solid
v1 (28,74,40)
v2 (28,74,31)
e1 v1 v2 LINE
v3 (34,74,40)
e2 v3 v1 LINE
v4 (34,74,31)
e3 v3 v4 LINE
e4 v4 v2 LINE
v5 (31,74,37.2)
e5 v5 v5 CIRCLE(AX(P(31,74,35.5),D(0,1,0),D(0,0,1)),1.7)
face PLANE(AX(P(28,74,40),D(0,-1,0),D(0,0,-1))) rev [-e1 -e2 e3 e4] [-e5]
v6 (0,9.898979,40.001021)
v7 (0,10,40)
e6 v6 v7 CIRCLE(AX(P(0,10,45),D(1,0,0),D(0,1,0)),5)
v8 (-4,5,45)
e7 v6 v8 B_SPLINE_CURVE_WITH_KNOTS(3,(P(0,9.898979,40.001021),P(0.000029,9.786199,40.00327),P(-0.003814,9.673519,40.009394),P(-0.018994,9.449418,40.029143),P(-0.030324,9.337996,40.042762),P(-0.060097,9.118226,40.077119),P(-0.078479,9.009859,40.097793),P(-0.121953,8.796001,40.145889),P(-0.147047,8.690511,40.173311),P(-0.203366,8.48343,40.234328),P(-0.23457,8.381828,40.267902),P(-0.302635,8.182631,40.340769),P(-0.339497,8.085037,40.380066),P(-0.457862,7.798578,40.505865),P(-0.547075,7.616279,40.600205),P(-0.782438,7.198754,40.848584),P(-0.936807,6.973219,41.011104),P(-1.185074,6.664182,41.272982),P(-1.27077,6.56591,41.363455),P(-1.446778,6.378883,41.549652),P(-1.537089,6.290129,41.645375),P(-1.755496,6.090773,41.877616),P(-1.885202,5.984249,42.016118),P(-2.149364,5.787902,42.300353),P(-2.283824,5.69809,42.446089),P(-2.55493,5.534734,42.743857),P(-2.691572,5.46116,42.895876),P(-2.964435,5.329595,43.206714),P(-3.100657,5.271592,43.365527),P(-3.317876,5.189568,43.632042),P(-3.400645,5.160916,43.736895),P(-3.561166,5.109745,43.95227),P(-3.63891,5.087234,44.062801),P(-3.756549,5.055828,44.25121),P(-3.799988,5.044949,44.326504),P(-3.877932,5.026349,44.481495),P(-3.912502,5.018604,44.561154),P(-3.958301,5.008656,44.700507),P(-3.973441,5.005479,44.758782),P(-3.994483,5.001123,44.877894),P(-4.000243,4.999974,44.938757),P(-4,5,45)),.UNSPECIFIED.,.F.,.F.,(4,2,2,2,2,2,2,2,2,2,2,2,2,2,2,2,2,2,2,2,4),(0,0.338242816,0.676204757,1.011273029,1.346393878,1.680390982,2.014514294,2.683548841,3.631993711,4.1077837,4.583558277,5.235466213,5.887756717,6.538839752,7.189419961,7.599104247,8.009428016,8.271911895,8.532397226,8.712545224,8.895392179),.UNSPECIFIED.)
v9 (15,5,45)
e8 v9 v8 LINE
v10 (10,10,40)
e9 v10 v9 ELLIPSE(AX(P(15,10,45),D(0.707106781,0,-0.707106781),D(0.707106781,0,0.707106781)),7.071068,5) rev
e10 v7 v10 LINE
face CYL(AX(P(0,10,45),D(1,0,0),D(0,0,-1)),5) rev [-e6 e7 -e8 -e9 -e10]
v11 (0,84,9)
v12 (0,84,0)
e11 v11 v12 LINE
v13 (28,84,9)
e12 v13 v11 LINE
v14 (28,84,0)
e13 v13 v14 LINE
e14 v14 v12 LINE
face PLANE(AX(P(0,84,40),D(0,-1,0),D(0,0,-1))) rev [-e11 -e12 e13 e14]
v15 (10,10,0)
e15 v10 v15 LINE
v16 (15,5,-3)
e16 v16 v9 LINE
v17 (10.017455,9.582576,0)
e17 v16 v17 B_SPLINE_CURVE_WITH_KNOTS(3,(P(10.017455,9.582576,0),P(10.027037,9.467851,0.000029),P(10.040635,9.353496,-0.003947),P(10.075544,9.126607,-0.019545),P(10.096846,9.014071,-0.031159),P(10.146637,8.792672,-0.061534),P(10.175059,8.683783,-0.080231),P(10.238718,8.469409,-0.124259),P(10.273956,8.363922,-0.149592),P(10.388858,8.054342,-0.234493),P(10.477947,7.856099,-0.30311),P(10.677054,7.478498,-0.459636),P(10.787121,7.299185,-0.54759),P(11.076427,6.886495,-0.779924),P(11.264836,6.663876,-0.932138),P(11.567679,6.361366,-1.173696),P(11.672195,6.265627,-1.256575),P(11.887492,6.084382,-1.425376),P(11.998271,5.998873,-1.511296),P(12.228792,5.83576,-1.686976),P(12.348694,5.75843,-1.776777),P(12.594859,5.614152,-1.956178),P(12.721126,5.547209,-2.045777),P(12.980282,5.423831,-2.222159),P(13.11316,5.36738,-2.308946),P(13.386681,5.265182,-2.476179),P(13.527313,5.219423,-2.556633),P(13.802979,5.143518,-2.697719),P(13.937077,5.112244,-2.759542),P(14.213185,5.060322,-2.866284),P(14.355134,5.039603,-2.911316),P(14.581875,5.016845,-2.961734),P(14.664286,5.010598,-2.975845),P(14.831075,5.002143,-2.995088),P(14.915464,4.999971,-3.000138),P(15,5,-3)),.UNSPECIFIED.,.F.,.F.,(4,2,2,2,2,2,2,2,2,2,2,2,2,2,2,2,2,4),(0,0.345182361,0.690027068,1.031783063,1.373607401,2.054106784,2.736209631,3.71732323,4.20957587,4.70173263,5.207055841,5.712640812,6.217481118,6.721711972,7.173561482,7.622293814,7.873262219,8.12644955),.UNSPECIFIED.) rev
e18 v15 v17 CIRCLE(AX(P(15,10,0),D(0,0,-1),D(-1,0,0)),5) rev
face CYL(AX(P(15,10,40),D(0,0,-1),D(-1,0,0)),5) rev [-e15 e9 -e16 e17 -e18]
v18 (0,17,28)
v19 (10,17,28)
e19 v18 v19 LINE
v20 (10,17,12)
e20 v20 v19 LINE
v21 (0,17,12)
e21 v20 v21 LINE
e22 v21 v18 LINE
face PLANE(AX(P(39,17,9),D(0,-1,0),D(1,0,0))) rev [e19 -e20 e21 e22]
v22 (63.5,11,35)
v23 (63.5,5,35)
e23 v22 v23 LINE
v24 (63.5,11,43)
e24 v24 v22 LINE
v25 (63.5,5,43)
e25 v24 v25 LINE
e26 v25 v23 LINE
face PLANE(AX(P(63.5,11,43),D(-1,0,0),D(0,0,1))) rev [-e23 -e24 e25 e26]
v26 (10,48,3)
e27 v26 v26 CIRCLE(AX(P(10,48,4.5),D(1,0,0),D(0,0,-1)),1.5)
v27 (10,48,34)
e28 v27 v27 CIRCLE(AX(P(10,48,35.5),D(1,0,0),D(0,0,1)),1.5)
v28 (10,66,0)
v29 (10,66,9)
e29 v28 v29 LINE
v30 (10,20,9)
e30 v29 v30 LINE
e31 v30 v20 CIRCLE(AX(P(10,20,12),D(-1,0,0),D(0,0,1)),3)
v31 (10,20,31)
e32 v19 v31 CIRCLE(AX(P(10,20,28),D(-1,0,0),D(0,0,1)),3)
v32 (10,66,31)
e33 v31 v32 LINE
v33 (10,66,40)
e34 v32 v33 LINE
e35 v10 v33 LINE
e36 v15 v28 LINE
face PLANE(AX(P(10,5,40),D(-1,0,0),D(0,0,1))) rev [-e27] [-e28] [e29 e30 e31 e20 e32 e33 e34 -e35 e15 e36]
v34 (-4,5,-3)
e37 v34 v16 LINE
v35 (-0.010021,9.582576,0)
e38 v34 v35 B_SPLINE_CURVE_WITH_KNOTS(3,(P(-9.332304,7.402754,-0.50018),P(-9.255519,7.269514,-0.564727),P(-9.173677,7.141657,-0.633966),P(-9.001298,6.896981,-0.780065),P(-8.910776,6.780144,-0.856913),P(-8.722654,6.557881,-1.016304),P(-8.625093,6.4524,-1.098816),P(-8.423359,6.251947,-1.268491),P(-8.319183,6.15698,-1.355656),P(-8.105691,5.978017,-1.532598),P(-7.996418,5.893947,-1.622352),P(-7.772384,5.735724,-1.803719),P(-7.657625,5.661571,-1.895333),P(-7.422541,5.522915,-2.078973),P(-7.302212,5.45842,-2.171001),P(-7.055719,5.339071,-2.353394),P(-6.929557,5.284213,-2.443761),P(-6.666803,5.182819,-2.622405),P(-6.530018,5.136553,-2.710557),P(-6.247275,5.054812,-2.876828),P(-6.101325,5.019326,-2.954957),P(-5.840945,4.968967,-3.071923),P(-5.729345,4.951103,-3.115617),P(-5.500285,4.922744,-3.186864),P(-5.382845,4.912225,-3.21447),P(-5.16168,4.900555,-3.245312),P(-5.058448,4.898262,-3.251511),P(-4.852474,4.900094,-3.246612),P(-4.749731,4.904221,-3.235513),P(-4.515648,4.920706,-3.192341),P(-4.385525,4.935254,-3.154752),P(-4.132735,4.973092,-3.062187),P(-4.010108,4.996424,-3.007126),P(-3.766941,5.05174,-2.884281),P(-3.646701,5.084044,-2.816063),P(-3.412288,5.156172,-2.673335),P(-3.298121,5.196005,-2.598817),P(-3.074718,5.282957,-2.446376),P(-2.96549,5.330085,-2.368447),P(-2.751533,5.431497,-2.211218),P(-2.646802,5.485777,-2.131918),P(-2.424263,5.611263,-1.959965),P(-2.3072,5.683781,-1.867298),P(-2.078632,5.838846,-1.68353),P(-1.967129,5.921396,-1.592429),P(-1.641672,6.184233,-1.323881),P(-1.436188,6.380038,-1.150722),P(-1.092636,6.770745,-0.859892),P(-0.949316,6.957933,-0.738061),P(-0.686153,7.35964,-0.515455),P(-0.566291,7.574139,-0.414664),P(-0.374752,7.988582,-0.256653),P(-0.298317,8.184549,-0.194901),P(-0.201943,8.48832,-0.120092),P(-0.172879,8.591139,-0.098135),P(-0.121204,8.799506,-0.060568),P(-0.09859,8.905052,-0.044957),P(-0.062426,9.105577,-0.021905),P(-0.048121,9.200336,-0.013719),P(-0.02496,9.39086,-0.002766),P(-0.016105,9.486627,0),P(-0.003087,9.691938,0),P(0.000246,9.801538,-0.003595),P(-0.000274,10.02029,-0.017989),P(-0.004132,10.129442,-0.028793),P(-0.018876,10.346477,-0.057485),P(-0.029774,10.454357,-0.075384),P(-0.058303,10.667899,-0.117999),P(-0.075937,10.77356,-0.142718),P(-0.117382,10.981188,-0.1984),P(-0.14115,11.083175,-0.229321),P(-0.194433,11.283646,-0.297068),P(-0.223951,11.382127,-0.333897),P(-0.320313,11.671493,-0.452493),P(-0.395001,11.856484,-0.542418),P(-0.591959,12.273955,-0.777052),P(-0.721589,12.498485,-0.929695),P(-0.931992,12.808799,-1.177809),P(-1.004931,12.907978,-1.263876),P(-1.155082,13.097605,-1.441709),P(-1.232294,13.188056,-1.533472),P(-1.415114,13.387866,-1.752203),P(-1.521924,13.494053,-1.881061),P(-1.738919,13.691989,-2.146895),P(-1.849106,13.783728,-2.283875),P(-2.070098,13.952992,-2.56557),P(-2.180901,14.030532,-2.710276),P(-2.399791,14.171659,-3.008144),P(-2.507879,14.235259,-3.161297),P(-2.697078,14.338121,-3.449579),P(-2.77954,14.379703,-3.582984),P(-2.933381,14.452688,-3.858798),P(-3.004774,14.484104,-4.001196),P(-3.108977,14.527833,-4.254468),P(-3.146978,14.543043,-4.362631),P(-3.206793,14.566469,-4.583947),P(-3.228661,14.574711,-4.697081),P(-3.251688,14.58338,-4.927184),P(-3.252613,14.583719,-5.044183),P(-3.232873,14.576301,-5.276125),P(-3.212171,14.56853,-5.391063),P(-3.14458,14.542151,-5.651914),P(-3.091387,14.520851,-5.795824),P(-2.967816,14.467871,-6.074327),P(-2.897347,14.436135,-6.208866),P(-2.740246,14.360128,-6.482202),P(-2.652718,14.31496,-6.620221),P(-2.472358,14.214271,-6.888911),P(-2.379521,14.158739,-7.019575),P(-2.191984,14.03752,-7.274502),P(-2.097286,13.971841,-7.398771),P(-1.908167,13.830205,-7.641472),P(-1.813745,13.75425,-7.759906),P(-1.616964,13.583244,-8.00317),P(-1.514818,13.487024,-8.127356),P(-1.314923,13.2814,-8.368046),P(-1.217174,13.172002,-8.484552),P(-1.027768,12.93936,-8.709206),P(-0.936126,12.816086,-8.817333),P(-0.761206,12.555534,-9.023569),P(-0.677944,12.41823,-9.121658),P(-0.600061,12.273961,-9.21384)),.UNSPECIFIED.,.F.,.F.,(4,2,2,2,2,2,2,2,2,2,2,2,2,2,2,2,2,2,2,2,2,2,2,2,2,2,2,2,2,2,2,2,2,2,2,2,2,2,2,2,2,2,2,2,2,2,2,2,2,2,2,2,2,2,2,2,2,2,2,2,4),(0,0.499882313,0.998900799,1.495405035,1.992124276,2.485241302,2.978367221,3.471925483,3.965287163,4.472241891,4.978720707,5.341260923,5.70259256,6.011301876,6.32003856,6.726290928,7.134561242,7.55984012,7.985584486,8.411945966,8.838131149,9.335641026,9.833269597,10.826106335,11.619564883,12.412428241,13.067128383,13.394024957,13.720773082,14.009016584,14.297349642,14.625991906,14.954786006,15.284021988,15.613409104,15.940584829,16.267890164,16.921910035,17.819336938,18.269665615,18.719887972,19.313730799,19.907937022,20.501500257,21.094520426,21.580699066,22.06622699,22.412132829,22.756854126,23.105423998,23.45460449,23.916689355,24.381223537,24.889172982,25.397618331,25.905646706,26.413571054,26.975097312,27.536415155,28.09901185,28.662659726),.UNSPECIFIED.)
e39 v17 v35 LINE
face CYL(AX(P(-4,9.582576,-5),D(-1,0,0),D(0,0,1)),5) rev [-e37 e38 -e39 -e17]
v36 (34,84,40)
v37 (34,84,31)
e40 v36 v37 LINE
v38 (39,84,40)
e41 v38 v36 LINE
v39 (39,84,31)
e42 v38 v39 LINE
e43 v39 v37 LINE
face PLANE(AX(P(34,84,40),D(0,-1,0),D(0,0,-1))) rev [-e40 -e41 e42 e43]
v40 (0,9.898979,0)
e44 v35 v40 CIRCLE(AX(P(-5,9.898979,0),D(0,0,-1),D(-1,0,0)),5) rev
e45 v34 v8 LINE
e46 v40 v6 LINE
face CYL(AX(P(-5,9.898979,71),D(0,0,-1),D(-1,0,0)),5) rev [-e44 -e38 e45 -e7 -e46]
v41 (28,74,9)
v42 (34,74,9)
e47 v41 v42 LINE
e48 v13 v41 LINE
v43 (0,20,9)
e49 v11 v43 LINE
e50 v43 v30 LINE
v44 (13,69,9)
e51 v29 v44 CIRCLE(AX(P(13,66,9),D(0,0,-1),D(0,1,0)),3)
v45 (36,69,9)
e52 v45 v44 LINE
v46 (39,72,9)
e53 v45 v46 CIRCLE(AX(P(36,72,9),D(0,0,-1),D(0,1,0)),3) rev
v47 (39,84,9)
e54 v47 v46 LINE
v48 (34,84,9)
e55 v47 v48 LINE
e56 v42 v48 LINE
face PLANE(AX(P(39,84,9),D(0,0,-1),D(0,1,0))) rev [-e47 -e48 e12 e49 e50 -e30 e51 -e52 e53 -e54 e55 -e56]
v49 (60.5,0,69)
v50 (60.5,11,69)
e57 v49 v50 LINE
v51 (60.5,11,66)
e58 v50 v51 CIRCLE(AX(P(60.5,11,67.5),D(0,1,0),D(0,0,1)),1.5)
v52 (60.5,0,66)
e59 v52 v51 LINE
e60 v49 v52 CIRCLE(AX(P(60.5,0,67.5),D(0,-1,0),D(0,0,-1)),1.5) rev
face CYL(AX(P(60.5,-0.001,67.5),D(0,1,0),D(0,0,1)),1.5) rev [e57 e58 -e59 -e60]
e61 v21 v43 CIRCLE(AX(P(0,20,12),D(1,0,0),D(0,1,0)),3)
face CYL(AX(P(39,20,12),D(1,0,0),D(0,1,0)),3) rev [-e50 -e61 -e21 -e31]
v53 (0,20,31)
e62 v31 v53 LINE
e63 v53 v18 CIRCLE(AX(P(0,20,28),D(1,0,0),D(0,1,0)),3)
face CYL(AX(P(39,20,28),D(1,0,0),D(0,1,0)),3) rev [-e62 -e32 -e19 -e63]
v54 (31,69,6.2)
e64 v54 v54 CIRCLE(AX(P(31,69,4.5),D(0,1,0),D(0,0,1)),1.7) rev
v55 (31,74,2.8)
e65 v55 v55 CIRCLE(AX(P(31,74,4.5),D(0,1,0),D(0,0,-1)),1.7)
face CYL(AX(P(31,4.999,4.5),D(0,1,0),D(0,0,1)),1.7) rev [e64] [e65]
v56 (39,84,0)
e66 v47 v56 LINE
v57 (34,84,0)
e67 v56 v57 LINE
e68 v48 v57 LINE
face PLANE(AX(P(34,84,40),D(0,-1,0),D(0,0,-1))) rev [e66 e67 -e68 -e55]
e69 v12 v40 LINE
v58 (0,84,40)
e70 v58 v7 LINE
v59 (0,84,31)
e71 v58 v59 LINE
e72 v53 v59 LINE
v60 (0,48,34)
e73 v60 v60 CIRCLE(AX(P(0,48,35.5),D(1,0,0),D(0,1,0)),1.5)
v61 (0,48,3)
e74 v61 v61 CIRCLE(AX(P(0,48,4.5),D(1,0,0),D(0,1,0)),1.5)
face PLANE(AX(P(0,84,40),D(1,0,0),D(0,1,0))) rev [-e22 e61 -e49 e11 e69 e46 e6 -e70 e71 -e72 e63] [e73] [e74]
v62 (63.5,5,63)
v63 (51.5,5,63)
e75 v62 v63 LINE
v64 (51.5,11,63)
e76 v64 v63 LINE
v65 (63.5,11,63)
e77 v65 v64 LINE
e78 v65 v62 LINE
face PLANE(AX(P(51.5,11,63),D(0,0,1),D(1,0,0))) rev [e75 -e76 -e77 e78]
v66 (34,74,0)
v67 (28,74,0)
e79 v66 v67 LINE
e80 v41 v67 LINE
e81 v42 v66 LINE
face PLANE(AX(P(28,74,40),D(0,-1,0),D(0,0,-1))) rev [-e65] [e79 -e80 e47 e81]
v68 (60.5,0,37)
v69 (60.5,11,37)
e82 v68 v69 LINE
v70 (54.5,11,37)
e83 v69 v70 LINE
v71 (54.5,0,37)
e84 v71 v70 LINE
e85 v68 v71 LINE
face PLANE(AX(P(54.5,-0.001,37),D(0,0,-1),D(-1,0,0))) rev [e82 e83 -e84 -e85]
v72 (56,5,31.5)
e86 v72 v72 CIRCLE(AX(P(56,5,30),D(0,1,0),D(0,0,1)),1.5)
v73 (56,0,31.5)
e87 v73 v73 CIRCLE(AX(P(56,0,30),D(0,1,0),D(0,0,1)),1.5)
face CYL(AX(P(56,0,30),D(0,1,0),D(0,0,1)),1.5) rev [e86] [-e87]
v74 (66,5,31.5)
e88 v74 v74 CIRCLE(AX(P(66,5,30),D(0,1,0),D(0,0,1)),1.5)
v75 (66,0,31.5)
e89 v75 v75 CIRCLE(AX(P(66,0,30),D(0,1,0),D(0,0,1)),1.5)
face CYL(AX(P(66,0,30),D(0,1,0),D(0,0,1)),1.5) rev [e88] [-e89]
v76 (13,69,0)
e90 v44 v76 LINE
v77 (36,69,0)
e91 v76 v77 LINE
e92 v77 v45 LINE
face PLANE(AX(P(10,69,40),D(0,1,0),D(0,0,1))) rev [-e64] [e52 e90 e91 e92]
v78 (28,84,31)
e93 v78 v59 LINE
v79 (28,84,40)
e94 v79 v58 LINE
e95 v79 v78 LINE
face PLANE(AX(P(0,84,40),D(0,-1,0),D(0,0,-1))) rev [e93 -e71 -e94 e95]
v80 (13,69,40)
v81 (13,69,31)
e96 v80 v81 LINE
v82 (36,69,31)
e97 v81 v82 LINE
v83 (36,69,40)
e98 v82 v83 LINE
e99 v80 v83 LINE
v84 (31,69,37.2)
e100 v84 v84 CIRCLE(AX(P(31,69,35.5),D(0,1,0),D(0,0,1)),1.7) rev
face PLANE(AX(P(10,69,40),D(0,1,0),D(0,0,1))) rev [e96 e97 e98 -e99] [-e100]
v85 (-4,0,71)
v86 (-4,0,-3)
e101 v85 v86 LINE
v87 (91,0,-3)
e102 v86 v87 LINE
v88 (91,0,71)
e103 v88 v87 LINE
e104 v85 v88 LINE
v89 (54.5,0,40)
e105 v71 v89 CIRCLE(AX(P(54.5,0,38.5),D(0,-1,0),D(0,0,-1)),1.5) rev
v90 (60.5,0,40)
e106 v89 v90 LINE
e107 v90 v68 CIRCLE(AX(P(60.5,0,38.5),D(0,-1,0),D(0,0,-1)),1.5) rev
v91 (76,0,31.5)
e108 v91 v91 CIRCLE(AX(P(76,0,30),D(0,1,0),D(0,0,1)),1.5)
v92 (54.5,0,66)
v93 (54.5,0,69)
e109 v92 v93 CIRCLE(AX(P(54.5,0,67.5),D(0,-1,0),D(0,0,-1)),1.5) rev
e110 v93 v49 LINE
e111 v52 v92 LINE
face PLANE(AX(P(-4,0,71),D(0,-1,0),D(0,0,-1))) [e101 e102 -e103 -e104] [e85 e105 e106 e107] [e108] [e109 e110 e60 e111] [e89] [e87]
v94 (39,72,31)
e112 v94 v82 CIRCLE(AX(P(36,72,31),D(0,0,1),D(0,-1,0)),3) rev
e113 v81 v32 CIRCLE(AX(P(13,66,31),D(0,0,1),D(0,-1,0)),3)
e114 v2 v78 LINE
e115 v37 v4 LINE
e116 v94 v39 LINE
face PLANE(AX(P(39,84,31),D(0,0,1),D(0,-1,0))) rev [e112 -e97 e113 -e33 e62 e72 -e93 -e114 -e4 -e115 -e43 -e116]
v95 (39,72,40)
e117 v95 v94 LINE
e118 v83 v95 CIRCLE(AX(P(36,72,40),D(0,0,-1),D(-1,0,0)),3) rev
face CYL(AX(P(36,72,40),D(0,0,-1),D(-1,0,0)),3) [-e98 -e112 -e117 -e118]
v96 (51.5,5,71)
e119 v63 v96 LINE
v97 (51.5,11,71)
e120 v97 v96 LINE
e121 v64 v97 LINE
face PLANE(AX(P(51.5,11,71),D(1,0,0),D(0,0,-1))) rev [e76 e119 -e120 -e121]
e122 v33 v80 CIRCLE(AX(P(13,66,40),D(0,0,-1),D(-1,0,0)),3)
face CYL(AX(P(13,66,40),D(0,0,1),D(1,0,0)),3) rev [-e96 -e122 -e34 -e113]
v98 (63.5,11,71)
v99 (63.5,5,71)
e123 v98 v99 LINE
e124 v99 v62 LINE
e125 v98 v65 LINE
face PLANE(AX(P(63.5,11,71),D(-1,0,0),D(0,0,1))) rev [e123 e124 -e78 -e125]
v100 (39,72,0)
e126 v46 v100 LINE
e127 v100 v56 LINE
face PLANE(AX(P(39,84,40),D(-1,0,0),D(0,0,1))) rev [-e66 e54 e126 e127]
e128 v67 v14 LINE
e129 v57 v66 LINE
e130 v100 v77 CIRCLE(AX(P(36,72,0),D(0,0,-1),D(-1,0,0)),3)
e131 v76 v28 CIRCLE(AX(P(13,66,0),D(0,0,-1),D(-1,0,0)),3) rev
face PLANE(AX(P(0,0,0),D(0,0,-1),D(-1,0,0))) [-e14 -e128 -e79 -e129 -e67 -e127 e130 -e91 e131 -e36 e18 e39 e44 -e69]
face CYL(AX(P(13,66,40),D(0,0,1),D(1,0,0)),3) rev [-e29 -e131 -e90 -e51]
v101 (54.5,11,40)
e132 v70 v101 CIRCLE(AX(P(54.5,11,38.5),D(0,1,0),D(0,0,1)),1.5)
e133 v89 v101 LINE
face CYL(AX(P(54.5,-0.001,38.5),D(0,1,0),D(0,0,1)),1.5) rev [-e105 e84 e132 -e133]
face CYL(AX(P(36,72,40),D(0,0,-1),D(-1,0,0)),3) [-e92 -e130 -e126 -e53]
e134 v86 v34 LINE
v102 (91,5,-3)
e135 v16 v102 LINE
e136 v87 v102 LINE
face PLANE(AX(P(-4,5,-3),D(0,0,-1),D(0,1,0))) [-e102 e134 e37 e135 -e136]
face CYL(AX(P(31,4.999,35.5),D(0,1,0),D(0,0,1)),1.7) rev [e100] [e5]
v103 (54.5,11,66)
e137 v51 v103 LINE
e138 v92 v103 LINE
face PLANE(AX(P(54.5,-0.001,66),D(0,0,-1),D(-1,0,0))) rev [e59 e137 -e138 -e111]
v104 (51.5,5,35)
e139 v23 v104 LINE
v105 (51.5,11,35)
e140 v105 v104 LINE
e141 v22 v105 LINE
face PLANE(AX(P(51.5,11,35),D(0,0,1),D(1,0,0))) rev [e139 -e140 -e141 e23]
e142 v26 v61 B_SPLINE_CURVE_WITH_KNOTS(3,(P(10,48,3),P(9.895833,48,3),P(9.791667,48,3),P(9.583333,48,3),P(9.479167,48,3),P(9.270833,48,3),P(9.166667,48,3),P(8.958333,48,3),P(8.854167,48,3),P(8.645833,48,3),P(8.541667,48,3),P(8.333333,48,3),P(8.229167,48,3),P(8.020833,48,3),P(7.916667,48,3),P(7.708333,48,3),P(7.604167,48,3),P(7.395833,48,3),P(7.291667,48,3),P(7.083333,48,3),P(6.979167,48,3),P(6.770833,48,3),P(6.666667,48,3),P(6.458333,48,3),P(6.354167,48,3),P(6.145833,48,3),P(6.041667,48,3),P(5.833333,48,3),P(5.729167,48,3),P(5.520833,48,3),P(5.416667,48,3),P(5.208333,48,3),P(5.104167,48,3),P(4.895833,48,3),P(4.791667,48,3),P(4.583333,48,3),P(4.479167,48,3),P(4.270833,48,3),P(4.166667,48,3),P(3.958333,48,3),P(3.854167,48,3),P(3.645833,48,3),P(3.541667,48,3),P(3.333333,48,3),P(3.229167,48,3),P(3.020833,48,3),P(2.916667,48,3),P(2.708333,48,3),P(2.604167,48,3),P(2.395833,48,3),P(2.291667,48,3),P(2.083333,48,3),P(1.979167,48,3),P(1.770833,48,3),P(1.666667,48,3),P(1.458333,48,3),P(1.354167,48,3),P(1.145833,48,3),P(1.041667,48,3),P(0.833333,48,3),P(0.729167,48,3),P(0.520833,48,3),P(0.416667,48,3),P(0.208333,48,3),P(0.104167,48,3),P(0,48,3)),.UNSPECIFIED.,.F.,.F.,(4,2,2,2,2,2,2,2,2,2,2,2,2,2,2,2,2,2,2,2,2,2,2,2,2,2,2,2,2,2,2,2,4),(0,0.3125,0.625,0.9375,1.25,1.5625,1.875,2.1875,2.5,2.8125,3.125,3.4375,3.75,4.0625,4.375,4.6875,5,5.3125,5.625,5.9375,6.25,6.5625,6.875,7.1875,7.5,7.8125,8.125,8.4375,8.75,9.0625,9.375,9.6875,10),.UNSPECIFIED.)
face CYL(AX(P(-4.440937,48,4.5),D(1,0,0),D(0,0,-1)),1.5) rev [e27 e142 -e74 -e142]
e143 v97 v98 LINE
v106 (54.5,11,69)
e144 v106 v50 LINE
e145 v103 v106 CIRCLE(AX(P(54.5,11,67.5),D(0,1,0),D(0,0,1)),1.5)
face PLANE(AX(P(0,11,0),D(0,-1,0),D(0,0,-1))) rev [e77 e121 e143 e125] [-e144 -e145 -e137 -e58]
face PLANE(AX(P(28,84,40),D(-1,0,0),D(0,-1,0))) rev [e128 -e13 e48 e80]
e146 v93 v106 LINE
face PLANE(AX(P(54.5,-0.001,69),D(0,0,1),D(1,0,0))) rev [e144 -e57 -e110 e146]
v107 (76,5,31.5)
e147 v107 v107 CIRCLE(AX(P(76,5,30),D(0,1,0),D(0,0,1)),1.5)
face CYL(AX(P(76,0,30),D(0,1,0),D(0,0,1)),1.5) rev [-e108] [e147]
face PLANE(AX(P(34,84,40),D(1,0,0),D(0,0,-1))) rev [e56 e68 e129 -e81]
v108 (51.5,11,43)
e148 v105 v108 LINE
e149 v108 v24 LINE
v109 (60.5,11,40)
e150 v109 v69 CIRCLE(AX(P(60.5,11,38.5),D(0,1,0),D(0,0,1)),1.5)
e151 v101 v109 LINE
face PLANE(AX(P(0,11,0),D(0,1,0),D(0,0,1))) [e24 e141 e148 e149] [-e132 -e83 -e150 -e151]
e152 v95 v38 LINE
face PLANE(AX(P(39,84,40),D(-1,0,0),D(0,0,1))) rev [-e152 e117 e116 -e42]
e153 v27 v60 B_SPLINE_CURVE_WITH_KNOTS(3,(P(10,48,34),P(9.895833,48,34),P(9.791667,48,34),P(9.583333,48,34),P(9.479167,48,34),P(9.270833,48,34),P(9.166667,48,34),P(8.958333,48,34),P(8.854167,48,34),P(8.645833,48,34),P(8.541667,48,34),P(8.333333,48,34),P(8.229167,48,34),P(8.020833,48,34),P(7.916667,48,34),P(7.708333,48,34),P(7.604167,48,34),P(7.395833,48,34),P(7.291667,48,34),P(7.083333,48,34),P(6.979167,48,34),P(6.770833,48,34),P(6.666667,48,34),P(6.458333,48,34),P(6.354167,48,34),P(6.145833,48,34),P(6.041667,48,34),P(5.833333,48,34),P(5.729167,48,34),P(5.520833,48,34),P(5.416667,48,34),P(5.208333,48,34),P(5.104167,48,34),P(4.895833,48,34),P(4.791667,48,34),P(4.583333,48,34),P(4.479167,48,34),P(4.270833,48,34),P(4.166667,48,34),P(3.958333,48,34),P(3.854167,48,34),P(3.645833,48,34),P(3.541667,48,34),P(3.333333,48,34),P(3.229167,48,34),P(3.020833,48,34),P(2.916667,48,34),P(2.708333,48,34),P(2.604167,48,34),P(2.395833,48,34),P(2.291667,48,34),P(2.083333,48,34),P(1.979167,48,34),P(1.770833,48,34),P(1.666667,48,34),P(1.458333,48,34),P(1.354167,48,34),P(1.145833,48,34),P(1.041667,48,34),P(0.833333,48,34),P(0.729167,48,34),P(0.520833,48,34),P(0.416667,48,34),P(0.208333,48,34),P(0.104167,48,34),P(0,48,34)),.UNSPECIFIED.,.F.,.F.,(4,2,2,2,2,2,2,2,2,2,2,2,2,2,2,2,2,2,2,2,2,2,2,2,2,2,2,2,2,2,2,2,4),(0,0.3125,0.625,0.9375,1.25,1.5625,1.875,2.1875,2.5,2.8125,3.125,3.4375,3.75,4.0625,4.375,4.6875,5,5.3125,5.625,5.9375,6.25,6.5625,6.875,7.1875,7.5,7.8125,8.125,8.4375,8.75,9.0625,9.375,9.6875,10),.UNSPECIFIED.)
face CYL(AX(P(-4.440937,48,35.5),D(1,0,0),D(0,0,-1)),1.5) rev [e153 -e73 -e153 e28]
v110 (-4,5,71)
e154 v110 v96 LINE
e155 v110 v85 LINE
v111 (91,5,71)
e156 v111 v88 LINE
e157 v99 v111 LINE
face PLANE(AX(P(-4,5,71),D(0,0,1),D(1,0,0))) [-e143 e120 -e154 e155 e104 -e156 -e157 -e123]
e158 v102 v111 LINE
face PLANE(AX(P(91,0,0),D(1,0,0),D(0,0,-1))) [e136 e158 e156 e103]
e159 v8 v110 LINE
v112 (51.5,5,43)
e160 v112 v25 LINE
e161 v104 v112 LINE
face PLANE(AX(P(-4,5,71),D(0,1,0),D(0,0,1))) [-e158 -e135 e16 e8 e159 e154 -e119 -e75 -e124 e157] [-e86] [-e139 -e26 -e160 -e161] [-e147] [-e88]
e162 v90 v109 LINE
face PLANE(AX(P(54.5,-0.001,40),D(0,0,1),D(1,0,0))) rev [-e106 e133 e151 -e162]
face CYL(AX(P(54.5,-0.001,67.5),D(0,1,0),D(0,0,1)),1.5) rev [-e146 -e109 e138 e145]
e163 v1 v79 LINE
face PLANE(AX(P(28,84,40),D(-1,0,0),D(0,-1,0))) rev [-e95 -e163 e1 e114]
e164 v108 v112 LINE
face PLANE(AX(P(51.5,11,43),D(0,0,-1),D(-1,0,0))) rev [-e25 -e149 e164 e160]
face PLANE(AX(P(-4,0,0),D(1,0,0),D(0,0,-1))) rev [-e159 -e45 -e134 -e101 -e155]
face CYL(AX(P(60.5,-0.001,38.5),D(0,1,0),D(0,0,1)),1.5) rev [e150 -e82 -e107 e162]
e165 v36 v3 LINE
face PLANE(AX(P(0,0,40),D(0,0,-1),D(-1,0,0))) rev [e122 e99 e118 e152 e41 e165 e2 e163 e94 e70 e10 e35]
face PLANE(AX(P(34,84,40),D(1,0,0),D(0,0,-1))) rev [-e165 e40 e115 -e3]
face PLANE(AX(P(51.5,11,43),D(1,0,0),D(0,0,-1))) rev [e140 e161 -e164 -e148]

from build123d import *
from build123d.topology import SkipClean

# Parameters (mm, degrees)
BOSS_EXTRUDE1_DEPTH      = 40
SKETCH2_W                = 22
SKETCH2_H                = 67
CUT_EXTRUDE1_DEPTH       = 101.881118154
CUT_EXTRUDE2_REACH       = 90.781
SKETCH4_R                = 1.7
FILLET1_R                = 3
FILLET2_R                = 3
BOSS_EXTRUDE2_DEPTH      = 81
BOSS_EXTRUDE2_DEPTH_BACK = 14
SKETCH10_W               = 74
SKETCH10_H               = 5
CUT_EXTRUDE6_REACH       = 141.868
BOSS_EXTRUDE3_START      = 6
SKETCH14_W               = 12
SKETCH14_H               = 8
BOSS_EXTRUDE3_DEPTH      = 6
FILLET3_START            = -4.000007467
FILLET3_DEPTH            = 19.000007567
FILLET3_START_2          = -3.000020216
FILLET3_2_DEPTH          = 49.000020216
FILLET3_3_DEPTH          = 40
SKETCH15_R               = 1.5
CUT_EXTRUDE8_DEPTH       = 140.867794721
SKETCH16_R               = 1.5
CUT_EXTRUDE9_DEPTH       = 137.594289778


with BuildPart() as part:
    # Sketch1 → Boss-Extrude1 (new body)
    with BuildSketch(Plane.XY):
        Polygon((0, 84), (28, 84), (28, 74), (34, 74), (34, 84), (39, 84), (39, 69), (10, 69), (10, 5), (0, 5), align=None)
    extrude(amount=BOSS_EXTRUDE1_DEPTH)

    # Sketch2 → Cut-Extrude1 (cut, through all)
    with BuildSketch(Plane.ZY):
        with Locations((20, 50.5)):
            Rectangle(SKETCH2_W, SKETCH2_H)
    extrude(amount=-CUT_EXTRUDE1_DEPTH, mode=Mode.SUBTRACT)

    # Sketch4 → Cut-Extrude2 (cut, up to next)
    with BuildSketch(Plane(origin=(0, 74, 0), x_dir=(1, 0, 0), z_dir=(0, 1, 0)), mode=Mode.PRIVATE) as cut_extrude2_sk1:
        with Locations(Location((31, -35.5, 0), (0, 0, 270))):
            Circle(SKETCH4_R)
    cut_extrude2_tool1 = extrude(cut_extrude2_sk1.sketch, amount=-CUT_EXTRUDE2_REACH, mode=Mode.PRIVATE) & part.part
    # Sketch4 → Cut-Extrude2 (cut, up to next)
    with BuildSketch(Plane(origin=(0, 74, 0), x_dir=(1, 0, 0), z_dir=(0, 1, 0)), mode=Mode.PRIVATE) as cut_extrude2_sk2:
        with Locations(Location((31, -4.5, 0), (0, 0, 270))):
            Circle(SKETCH4_R)
    cut_extrude2_tool2 = extrude(cut_extrude2_sk2.sketch, amount=-CUT_EXTRUDE2_REACH, mode=Mode.PRIVATE) & part.part
    add(cut_extrude2_tool1.solids().sort_by_distance((31, 74, 35.5))[0], mode=Mode.SUBTRACT)
    add(cut_extrude2_tool2.solids().sort_by_distance((31, 74, 4.5))[0], mode=Mode.SUBTRACT)

    # Fillet1
    fillet1_edges = [part.edges().sort_by_distance(p)[0] for p in [
        (5, 17, 31),
        (5, 17, 9),
    ]]
    fillet(fillet1_edges, radius=FILLET1_R)

    # Fillet2
    fillet2_edges = [part.edges().sort_by_distance(p)[0] for p in [
        (39, 69, 35.5),
        (10, 69, 35.5),
        (39, 69, 4.5),
        (10, 69, 4.5),
    ]]
    fillet(fillet2_edges, radius=FILLET2_R)

    # Sketch10 → Boss-Extrude2 (add, two sides: drawn at the far end of the back side and taken through both)
    with BuildSketch(Plane(origin=(10, 0, 0), x_dir=(0, 0, -1), z_dir=(1, 0, 0)).offset(-BOSS_EXTRUDE2_DEPTH_BACK)):
        with Locations((-34, 2.5)):
            Rectangle(SKETCH10_W, SKETCH10_H)
    extrude(amount=BOSS_EXTRUDE2_DEPTH + BOSS_EXTRUDE2_DEPTH_BACK)

    # Sketch13 → Cut-Extrude6 (cut, up to next)
    with BuildSketch(Plane(origin=(0, 5, 0), x_dir=(1, 0, 0), z_dir=(0, 1, 0)), mode=Mode.PRIVATE) as cut_extrude6_sk1:
        with BuildLine():
            Line((54.5, -66), (60.5, -66))
            ThreePointArc((60.5, -66), (62, -67.5), (60.5, -69))
            Line((60.5, -69), (54.5, -69))
            ThreePointArc((54.5, -69), (53, -67.5), (54.5, -66))
        make_face()
    cut_extrude6_tool1 = extrude(cut_extrude6_sk1.sketch, amount=-CUT_EXTRUDE6_REACH, mode=Mode.PRIVATE) & part.part
    # Sketch13 → Cut-Extrude6 (cut, up to next)
    with BuildSketch(Plane(origin=(0, 5, 0), x_dir=(1, 0, 0), z_dir=(0, 1, 0)), mode=Mode.PRIVATE) as cut_extrude6_sk2:
        with BuildLine():
            Line((54.5, -37), (60.5, -37))
            ThreePointArc((60.5, -37), (62, -38.5), (60.5, -40))
            Line((60.5, -40), (54.5, -40))
            ThreePointArc((54.5, -40), (53, -38.5), (54.5, -37))
        make_face()
    cut_extrude6_tool2 = extrude(cut_extrude6_sk2.sketch, amount=-CUT_EXTRUDE6_REACH, mode=Mode.PRIVATE) & part.part
    add(cut_extrude6_tool1.solids().sort_by_distance((57.5, 5, 67.5))[0], mode=Mode.SUBTRACT)
    add(cut_extrude6_tool2.solids().sort_by_distance((57.5, 5, 38.5))[0], mode=Mode.SUBTRACT)

    # Sketch14 → Boss-Extrude3 (add)
    # profile 1 of 2: a face of its own
    with BuildSketch(Plane(origin=(0, 5, 0), x_dir=(1, 0, 0), z_dir=(0, 1, 0)).offset(BOSS_EXTRUDE3_START)):
        with Locations((57.5, -67)):
            Rectangle(SKETCH14_W, SKETCH14_H)
        with BuildLine():
            Line((60.5, -66), (54.5, -66))
            ThreePointArc((54.5, -66), (53, -67.5), (54.5, -69))
            Line((54.5, -69), (60.5, -69))
            ThreePointArc((60.5, -69), (62, -67.5), (60.5, -66))
        make_face(mode=Mode.SUBTRACT)
    # profile 2 of 2: a face of its own
    with BuildSketch(Plane(origin=(0, 5, 0), x_dir=(1, 0, 0), z_dir=(0, 1, 0)).offset(BOSS_EXTRUDE3_START)):
        with Locations((57.5, -39)):
            Rectangle(SKETCH14_W, SKETCH14_H)
        with BuildLine():
            Line((60.5, -37), (54.5, -37))
            ThreePointArc((54.5, -37), (53, -38.5), (54.5, -40))
            Line((54.5, -40), (60.5, -40))
            ThreePointArc((60.5, -40), (62, -38.5), (60.5, -37))
        make_face(mode=Mode.SUBTRACT)
    extrude(amount=-BOSS_EXTRUDE3_DEPTH)

    # Fillet3: read off the stored shape, not the designer's step
    # Fillet3 outline → Fillet3 (add)
    with BuildSketch(Plane.YZ.offset(FILLET3_START)):
        with BuildLine():
            Line((9.582575695, 0), (5, 0))
            Line((5, 0), (4.99997988, -3.0000461))
            ThreePointArc((4.99997988, -3.0000461), (6.843941866, -0.816713642), (9.582575695, 0))
        make_face()
        with BuildLine():
            ThreePointArc((10, 40), (6.464466094, 41.464466094), (5, 45))
            Line((5, 45), (5, 40))
            Line((5, 40), (10, 40))
        make_face()
    extrude(amount=FILLET3_DEPTH)

    # Fillet3 2 outline → Fillet3 2 (cut)
    with BuildSketch(Plane.XY.offset(FILLET3_START_2)):
        with BuildLine():
            ThreePointArc((-4.000007348, 4.9999985), (-1.127019025, 6.736698921), (0, 9.898979486))
            Line((0, 9.898979486), (0, 12))
            Line((0, 12), (-4.000007467, 12))
            Line((-4.000007467, 12), (-4.000007467, 10))
            Line((-4.000007467, 10), (-4.000007467, 9.582575695))
            Line((-4.000007467, 9.582575695), (-4.000007348, 4.9999985))
        make_face()
        with BuildLine():
            Line((15.0000001, 12), (10, 12))
            Line((10, 12), (10, 10))
            ThreePointArc((10, 10), (11.464466094, 6.464466094), (15, 5))
            Line((15, 5), (15.0000001, 9.582575695))
            Line((15.0000001, 9.582575695), (15.0000001, 10))
            Line((15.0000001, 10), (15.0000001, 12))
        make_face()
    extrude(amount=FILLET3_2_DEPTH, mode=Mode.SUBTRACT)

    # Fillet3 3 outline → Fillet3 3 (add)
    with SkipClean():  # the faces are left unmerged after this step: merging them gives an invalid solid
        with BuildSketch(Plane.XY):
            with BuildLine():
                Line((0, 12), (0, 9.898979486))
                ThreePointArc((0, 9.898979486), (-1.127019025, 6.736698921), (-4.000007348, 4.9999985))
                Line((-4.000007348, 4.9999985), (15, 5))
                ThreePointArc((15, 5), (11.464466094, 6.464466094), (10, 10))
                Line((10, 10), (10, 12))
                Line((10, 12), (0, 12))
            make_face()
        extrude(amount=FILLET3_3_DEPTH)
    add(part.part.scale(1), mode=Mode.REPLACE)  # the faces are merged on a copy

    # Sketch15 → Cut-Extrude8 (cut, through all)
    with SkipClean():  # the faces are left unmerged after this step: merging them gives an invalid solid
        with BuildSketch(Plane(origin=(0, 5, 0), x_dir=(1, 0, 0), z_dir=(0, 1, 0))):
            with Locations(Location((66, -30, 0), (0, 0, 270))):
                Circle(SKETCH15_R)
            with Locations(Location((76, -30, 0), (0, 0, 270))):
                Circle(SKETCH15_R)
            with Locations(Location((56, -30, 0), (0, 0, 270))):
                Circle(SKETCH15_R)
        extrude(amount=-CUT_EXTRUDE8_DEPTH, mode=Mode.SUBTRACT)

    # Sketch16 → Cut-Extrude9 (cut, through all)
    with SkipClean():  # the faces are left unmerged after this step: merging them gives an invalid solid
        with BuildSketch(Plane(origin=(10, 0, 0), x_dir=(0, 0, -1), z_dir=(1, 0, 0))):
            with Locations((-4.5, 48)):
                Circle(SKETCH16_R)
            with Locations((-35.5, 48)):
                Circle(SKETCH16_R)
        extrude(amount=-CUT_EXTRUDE9_DEPTH, mode=Mode.SUBTRACT)


solid = part.part
